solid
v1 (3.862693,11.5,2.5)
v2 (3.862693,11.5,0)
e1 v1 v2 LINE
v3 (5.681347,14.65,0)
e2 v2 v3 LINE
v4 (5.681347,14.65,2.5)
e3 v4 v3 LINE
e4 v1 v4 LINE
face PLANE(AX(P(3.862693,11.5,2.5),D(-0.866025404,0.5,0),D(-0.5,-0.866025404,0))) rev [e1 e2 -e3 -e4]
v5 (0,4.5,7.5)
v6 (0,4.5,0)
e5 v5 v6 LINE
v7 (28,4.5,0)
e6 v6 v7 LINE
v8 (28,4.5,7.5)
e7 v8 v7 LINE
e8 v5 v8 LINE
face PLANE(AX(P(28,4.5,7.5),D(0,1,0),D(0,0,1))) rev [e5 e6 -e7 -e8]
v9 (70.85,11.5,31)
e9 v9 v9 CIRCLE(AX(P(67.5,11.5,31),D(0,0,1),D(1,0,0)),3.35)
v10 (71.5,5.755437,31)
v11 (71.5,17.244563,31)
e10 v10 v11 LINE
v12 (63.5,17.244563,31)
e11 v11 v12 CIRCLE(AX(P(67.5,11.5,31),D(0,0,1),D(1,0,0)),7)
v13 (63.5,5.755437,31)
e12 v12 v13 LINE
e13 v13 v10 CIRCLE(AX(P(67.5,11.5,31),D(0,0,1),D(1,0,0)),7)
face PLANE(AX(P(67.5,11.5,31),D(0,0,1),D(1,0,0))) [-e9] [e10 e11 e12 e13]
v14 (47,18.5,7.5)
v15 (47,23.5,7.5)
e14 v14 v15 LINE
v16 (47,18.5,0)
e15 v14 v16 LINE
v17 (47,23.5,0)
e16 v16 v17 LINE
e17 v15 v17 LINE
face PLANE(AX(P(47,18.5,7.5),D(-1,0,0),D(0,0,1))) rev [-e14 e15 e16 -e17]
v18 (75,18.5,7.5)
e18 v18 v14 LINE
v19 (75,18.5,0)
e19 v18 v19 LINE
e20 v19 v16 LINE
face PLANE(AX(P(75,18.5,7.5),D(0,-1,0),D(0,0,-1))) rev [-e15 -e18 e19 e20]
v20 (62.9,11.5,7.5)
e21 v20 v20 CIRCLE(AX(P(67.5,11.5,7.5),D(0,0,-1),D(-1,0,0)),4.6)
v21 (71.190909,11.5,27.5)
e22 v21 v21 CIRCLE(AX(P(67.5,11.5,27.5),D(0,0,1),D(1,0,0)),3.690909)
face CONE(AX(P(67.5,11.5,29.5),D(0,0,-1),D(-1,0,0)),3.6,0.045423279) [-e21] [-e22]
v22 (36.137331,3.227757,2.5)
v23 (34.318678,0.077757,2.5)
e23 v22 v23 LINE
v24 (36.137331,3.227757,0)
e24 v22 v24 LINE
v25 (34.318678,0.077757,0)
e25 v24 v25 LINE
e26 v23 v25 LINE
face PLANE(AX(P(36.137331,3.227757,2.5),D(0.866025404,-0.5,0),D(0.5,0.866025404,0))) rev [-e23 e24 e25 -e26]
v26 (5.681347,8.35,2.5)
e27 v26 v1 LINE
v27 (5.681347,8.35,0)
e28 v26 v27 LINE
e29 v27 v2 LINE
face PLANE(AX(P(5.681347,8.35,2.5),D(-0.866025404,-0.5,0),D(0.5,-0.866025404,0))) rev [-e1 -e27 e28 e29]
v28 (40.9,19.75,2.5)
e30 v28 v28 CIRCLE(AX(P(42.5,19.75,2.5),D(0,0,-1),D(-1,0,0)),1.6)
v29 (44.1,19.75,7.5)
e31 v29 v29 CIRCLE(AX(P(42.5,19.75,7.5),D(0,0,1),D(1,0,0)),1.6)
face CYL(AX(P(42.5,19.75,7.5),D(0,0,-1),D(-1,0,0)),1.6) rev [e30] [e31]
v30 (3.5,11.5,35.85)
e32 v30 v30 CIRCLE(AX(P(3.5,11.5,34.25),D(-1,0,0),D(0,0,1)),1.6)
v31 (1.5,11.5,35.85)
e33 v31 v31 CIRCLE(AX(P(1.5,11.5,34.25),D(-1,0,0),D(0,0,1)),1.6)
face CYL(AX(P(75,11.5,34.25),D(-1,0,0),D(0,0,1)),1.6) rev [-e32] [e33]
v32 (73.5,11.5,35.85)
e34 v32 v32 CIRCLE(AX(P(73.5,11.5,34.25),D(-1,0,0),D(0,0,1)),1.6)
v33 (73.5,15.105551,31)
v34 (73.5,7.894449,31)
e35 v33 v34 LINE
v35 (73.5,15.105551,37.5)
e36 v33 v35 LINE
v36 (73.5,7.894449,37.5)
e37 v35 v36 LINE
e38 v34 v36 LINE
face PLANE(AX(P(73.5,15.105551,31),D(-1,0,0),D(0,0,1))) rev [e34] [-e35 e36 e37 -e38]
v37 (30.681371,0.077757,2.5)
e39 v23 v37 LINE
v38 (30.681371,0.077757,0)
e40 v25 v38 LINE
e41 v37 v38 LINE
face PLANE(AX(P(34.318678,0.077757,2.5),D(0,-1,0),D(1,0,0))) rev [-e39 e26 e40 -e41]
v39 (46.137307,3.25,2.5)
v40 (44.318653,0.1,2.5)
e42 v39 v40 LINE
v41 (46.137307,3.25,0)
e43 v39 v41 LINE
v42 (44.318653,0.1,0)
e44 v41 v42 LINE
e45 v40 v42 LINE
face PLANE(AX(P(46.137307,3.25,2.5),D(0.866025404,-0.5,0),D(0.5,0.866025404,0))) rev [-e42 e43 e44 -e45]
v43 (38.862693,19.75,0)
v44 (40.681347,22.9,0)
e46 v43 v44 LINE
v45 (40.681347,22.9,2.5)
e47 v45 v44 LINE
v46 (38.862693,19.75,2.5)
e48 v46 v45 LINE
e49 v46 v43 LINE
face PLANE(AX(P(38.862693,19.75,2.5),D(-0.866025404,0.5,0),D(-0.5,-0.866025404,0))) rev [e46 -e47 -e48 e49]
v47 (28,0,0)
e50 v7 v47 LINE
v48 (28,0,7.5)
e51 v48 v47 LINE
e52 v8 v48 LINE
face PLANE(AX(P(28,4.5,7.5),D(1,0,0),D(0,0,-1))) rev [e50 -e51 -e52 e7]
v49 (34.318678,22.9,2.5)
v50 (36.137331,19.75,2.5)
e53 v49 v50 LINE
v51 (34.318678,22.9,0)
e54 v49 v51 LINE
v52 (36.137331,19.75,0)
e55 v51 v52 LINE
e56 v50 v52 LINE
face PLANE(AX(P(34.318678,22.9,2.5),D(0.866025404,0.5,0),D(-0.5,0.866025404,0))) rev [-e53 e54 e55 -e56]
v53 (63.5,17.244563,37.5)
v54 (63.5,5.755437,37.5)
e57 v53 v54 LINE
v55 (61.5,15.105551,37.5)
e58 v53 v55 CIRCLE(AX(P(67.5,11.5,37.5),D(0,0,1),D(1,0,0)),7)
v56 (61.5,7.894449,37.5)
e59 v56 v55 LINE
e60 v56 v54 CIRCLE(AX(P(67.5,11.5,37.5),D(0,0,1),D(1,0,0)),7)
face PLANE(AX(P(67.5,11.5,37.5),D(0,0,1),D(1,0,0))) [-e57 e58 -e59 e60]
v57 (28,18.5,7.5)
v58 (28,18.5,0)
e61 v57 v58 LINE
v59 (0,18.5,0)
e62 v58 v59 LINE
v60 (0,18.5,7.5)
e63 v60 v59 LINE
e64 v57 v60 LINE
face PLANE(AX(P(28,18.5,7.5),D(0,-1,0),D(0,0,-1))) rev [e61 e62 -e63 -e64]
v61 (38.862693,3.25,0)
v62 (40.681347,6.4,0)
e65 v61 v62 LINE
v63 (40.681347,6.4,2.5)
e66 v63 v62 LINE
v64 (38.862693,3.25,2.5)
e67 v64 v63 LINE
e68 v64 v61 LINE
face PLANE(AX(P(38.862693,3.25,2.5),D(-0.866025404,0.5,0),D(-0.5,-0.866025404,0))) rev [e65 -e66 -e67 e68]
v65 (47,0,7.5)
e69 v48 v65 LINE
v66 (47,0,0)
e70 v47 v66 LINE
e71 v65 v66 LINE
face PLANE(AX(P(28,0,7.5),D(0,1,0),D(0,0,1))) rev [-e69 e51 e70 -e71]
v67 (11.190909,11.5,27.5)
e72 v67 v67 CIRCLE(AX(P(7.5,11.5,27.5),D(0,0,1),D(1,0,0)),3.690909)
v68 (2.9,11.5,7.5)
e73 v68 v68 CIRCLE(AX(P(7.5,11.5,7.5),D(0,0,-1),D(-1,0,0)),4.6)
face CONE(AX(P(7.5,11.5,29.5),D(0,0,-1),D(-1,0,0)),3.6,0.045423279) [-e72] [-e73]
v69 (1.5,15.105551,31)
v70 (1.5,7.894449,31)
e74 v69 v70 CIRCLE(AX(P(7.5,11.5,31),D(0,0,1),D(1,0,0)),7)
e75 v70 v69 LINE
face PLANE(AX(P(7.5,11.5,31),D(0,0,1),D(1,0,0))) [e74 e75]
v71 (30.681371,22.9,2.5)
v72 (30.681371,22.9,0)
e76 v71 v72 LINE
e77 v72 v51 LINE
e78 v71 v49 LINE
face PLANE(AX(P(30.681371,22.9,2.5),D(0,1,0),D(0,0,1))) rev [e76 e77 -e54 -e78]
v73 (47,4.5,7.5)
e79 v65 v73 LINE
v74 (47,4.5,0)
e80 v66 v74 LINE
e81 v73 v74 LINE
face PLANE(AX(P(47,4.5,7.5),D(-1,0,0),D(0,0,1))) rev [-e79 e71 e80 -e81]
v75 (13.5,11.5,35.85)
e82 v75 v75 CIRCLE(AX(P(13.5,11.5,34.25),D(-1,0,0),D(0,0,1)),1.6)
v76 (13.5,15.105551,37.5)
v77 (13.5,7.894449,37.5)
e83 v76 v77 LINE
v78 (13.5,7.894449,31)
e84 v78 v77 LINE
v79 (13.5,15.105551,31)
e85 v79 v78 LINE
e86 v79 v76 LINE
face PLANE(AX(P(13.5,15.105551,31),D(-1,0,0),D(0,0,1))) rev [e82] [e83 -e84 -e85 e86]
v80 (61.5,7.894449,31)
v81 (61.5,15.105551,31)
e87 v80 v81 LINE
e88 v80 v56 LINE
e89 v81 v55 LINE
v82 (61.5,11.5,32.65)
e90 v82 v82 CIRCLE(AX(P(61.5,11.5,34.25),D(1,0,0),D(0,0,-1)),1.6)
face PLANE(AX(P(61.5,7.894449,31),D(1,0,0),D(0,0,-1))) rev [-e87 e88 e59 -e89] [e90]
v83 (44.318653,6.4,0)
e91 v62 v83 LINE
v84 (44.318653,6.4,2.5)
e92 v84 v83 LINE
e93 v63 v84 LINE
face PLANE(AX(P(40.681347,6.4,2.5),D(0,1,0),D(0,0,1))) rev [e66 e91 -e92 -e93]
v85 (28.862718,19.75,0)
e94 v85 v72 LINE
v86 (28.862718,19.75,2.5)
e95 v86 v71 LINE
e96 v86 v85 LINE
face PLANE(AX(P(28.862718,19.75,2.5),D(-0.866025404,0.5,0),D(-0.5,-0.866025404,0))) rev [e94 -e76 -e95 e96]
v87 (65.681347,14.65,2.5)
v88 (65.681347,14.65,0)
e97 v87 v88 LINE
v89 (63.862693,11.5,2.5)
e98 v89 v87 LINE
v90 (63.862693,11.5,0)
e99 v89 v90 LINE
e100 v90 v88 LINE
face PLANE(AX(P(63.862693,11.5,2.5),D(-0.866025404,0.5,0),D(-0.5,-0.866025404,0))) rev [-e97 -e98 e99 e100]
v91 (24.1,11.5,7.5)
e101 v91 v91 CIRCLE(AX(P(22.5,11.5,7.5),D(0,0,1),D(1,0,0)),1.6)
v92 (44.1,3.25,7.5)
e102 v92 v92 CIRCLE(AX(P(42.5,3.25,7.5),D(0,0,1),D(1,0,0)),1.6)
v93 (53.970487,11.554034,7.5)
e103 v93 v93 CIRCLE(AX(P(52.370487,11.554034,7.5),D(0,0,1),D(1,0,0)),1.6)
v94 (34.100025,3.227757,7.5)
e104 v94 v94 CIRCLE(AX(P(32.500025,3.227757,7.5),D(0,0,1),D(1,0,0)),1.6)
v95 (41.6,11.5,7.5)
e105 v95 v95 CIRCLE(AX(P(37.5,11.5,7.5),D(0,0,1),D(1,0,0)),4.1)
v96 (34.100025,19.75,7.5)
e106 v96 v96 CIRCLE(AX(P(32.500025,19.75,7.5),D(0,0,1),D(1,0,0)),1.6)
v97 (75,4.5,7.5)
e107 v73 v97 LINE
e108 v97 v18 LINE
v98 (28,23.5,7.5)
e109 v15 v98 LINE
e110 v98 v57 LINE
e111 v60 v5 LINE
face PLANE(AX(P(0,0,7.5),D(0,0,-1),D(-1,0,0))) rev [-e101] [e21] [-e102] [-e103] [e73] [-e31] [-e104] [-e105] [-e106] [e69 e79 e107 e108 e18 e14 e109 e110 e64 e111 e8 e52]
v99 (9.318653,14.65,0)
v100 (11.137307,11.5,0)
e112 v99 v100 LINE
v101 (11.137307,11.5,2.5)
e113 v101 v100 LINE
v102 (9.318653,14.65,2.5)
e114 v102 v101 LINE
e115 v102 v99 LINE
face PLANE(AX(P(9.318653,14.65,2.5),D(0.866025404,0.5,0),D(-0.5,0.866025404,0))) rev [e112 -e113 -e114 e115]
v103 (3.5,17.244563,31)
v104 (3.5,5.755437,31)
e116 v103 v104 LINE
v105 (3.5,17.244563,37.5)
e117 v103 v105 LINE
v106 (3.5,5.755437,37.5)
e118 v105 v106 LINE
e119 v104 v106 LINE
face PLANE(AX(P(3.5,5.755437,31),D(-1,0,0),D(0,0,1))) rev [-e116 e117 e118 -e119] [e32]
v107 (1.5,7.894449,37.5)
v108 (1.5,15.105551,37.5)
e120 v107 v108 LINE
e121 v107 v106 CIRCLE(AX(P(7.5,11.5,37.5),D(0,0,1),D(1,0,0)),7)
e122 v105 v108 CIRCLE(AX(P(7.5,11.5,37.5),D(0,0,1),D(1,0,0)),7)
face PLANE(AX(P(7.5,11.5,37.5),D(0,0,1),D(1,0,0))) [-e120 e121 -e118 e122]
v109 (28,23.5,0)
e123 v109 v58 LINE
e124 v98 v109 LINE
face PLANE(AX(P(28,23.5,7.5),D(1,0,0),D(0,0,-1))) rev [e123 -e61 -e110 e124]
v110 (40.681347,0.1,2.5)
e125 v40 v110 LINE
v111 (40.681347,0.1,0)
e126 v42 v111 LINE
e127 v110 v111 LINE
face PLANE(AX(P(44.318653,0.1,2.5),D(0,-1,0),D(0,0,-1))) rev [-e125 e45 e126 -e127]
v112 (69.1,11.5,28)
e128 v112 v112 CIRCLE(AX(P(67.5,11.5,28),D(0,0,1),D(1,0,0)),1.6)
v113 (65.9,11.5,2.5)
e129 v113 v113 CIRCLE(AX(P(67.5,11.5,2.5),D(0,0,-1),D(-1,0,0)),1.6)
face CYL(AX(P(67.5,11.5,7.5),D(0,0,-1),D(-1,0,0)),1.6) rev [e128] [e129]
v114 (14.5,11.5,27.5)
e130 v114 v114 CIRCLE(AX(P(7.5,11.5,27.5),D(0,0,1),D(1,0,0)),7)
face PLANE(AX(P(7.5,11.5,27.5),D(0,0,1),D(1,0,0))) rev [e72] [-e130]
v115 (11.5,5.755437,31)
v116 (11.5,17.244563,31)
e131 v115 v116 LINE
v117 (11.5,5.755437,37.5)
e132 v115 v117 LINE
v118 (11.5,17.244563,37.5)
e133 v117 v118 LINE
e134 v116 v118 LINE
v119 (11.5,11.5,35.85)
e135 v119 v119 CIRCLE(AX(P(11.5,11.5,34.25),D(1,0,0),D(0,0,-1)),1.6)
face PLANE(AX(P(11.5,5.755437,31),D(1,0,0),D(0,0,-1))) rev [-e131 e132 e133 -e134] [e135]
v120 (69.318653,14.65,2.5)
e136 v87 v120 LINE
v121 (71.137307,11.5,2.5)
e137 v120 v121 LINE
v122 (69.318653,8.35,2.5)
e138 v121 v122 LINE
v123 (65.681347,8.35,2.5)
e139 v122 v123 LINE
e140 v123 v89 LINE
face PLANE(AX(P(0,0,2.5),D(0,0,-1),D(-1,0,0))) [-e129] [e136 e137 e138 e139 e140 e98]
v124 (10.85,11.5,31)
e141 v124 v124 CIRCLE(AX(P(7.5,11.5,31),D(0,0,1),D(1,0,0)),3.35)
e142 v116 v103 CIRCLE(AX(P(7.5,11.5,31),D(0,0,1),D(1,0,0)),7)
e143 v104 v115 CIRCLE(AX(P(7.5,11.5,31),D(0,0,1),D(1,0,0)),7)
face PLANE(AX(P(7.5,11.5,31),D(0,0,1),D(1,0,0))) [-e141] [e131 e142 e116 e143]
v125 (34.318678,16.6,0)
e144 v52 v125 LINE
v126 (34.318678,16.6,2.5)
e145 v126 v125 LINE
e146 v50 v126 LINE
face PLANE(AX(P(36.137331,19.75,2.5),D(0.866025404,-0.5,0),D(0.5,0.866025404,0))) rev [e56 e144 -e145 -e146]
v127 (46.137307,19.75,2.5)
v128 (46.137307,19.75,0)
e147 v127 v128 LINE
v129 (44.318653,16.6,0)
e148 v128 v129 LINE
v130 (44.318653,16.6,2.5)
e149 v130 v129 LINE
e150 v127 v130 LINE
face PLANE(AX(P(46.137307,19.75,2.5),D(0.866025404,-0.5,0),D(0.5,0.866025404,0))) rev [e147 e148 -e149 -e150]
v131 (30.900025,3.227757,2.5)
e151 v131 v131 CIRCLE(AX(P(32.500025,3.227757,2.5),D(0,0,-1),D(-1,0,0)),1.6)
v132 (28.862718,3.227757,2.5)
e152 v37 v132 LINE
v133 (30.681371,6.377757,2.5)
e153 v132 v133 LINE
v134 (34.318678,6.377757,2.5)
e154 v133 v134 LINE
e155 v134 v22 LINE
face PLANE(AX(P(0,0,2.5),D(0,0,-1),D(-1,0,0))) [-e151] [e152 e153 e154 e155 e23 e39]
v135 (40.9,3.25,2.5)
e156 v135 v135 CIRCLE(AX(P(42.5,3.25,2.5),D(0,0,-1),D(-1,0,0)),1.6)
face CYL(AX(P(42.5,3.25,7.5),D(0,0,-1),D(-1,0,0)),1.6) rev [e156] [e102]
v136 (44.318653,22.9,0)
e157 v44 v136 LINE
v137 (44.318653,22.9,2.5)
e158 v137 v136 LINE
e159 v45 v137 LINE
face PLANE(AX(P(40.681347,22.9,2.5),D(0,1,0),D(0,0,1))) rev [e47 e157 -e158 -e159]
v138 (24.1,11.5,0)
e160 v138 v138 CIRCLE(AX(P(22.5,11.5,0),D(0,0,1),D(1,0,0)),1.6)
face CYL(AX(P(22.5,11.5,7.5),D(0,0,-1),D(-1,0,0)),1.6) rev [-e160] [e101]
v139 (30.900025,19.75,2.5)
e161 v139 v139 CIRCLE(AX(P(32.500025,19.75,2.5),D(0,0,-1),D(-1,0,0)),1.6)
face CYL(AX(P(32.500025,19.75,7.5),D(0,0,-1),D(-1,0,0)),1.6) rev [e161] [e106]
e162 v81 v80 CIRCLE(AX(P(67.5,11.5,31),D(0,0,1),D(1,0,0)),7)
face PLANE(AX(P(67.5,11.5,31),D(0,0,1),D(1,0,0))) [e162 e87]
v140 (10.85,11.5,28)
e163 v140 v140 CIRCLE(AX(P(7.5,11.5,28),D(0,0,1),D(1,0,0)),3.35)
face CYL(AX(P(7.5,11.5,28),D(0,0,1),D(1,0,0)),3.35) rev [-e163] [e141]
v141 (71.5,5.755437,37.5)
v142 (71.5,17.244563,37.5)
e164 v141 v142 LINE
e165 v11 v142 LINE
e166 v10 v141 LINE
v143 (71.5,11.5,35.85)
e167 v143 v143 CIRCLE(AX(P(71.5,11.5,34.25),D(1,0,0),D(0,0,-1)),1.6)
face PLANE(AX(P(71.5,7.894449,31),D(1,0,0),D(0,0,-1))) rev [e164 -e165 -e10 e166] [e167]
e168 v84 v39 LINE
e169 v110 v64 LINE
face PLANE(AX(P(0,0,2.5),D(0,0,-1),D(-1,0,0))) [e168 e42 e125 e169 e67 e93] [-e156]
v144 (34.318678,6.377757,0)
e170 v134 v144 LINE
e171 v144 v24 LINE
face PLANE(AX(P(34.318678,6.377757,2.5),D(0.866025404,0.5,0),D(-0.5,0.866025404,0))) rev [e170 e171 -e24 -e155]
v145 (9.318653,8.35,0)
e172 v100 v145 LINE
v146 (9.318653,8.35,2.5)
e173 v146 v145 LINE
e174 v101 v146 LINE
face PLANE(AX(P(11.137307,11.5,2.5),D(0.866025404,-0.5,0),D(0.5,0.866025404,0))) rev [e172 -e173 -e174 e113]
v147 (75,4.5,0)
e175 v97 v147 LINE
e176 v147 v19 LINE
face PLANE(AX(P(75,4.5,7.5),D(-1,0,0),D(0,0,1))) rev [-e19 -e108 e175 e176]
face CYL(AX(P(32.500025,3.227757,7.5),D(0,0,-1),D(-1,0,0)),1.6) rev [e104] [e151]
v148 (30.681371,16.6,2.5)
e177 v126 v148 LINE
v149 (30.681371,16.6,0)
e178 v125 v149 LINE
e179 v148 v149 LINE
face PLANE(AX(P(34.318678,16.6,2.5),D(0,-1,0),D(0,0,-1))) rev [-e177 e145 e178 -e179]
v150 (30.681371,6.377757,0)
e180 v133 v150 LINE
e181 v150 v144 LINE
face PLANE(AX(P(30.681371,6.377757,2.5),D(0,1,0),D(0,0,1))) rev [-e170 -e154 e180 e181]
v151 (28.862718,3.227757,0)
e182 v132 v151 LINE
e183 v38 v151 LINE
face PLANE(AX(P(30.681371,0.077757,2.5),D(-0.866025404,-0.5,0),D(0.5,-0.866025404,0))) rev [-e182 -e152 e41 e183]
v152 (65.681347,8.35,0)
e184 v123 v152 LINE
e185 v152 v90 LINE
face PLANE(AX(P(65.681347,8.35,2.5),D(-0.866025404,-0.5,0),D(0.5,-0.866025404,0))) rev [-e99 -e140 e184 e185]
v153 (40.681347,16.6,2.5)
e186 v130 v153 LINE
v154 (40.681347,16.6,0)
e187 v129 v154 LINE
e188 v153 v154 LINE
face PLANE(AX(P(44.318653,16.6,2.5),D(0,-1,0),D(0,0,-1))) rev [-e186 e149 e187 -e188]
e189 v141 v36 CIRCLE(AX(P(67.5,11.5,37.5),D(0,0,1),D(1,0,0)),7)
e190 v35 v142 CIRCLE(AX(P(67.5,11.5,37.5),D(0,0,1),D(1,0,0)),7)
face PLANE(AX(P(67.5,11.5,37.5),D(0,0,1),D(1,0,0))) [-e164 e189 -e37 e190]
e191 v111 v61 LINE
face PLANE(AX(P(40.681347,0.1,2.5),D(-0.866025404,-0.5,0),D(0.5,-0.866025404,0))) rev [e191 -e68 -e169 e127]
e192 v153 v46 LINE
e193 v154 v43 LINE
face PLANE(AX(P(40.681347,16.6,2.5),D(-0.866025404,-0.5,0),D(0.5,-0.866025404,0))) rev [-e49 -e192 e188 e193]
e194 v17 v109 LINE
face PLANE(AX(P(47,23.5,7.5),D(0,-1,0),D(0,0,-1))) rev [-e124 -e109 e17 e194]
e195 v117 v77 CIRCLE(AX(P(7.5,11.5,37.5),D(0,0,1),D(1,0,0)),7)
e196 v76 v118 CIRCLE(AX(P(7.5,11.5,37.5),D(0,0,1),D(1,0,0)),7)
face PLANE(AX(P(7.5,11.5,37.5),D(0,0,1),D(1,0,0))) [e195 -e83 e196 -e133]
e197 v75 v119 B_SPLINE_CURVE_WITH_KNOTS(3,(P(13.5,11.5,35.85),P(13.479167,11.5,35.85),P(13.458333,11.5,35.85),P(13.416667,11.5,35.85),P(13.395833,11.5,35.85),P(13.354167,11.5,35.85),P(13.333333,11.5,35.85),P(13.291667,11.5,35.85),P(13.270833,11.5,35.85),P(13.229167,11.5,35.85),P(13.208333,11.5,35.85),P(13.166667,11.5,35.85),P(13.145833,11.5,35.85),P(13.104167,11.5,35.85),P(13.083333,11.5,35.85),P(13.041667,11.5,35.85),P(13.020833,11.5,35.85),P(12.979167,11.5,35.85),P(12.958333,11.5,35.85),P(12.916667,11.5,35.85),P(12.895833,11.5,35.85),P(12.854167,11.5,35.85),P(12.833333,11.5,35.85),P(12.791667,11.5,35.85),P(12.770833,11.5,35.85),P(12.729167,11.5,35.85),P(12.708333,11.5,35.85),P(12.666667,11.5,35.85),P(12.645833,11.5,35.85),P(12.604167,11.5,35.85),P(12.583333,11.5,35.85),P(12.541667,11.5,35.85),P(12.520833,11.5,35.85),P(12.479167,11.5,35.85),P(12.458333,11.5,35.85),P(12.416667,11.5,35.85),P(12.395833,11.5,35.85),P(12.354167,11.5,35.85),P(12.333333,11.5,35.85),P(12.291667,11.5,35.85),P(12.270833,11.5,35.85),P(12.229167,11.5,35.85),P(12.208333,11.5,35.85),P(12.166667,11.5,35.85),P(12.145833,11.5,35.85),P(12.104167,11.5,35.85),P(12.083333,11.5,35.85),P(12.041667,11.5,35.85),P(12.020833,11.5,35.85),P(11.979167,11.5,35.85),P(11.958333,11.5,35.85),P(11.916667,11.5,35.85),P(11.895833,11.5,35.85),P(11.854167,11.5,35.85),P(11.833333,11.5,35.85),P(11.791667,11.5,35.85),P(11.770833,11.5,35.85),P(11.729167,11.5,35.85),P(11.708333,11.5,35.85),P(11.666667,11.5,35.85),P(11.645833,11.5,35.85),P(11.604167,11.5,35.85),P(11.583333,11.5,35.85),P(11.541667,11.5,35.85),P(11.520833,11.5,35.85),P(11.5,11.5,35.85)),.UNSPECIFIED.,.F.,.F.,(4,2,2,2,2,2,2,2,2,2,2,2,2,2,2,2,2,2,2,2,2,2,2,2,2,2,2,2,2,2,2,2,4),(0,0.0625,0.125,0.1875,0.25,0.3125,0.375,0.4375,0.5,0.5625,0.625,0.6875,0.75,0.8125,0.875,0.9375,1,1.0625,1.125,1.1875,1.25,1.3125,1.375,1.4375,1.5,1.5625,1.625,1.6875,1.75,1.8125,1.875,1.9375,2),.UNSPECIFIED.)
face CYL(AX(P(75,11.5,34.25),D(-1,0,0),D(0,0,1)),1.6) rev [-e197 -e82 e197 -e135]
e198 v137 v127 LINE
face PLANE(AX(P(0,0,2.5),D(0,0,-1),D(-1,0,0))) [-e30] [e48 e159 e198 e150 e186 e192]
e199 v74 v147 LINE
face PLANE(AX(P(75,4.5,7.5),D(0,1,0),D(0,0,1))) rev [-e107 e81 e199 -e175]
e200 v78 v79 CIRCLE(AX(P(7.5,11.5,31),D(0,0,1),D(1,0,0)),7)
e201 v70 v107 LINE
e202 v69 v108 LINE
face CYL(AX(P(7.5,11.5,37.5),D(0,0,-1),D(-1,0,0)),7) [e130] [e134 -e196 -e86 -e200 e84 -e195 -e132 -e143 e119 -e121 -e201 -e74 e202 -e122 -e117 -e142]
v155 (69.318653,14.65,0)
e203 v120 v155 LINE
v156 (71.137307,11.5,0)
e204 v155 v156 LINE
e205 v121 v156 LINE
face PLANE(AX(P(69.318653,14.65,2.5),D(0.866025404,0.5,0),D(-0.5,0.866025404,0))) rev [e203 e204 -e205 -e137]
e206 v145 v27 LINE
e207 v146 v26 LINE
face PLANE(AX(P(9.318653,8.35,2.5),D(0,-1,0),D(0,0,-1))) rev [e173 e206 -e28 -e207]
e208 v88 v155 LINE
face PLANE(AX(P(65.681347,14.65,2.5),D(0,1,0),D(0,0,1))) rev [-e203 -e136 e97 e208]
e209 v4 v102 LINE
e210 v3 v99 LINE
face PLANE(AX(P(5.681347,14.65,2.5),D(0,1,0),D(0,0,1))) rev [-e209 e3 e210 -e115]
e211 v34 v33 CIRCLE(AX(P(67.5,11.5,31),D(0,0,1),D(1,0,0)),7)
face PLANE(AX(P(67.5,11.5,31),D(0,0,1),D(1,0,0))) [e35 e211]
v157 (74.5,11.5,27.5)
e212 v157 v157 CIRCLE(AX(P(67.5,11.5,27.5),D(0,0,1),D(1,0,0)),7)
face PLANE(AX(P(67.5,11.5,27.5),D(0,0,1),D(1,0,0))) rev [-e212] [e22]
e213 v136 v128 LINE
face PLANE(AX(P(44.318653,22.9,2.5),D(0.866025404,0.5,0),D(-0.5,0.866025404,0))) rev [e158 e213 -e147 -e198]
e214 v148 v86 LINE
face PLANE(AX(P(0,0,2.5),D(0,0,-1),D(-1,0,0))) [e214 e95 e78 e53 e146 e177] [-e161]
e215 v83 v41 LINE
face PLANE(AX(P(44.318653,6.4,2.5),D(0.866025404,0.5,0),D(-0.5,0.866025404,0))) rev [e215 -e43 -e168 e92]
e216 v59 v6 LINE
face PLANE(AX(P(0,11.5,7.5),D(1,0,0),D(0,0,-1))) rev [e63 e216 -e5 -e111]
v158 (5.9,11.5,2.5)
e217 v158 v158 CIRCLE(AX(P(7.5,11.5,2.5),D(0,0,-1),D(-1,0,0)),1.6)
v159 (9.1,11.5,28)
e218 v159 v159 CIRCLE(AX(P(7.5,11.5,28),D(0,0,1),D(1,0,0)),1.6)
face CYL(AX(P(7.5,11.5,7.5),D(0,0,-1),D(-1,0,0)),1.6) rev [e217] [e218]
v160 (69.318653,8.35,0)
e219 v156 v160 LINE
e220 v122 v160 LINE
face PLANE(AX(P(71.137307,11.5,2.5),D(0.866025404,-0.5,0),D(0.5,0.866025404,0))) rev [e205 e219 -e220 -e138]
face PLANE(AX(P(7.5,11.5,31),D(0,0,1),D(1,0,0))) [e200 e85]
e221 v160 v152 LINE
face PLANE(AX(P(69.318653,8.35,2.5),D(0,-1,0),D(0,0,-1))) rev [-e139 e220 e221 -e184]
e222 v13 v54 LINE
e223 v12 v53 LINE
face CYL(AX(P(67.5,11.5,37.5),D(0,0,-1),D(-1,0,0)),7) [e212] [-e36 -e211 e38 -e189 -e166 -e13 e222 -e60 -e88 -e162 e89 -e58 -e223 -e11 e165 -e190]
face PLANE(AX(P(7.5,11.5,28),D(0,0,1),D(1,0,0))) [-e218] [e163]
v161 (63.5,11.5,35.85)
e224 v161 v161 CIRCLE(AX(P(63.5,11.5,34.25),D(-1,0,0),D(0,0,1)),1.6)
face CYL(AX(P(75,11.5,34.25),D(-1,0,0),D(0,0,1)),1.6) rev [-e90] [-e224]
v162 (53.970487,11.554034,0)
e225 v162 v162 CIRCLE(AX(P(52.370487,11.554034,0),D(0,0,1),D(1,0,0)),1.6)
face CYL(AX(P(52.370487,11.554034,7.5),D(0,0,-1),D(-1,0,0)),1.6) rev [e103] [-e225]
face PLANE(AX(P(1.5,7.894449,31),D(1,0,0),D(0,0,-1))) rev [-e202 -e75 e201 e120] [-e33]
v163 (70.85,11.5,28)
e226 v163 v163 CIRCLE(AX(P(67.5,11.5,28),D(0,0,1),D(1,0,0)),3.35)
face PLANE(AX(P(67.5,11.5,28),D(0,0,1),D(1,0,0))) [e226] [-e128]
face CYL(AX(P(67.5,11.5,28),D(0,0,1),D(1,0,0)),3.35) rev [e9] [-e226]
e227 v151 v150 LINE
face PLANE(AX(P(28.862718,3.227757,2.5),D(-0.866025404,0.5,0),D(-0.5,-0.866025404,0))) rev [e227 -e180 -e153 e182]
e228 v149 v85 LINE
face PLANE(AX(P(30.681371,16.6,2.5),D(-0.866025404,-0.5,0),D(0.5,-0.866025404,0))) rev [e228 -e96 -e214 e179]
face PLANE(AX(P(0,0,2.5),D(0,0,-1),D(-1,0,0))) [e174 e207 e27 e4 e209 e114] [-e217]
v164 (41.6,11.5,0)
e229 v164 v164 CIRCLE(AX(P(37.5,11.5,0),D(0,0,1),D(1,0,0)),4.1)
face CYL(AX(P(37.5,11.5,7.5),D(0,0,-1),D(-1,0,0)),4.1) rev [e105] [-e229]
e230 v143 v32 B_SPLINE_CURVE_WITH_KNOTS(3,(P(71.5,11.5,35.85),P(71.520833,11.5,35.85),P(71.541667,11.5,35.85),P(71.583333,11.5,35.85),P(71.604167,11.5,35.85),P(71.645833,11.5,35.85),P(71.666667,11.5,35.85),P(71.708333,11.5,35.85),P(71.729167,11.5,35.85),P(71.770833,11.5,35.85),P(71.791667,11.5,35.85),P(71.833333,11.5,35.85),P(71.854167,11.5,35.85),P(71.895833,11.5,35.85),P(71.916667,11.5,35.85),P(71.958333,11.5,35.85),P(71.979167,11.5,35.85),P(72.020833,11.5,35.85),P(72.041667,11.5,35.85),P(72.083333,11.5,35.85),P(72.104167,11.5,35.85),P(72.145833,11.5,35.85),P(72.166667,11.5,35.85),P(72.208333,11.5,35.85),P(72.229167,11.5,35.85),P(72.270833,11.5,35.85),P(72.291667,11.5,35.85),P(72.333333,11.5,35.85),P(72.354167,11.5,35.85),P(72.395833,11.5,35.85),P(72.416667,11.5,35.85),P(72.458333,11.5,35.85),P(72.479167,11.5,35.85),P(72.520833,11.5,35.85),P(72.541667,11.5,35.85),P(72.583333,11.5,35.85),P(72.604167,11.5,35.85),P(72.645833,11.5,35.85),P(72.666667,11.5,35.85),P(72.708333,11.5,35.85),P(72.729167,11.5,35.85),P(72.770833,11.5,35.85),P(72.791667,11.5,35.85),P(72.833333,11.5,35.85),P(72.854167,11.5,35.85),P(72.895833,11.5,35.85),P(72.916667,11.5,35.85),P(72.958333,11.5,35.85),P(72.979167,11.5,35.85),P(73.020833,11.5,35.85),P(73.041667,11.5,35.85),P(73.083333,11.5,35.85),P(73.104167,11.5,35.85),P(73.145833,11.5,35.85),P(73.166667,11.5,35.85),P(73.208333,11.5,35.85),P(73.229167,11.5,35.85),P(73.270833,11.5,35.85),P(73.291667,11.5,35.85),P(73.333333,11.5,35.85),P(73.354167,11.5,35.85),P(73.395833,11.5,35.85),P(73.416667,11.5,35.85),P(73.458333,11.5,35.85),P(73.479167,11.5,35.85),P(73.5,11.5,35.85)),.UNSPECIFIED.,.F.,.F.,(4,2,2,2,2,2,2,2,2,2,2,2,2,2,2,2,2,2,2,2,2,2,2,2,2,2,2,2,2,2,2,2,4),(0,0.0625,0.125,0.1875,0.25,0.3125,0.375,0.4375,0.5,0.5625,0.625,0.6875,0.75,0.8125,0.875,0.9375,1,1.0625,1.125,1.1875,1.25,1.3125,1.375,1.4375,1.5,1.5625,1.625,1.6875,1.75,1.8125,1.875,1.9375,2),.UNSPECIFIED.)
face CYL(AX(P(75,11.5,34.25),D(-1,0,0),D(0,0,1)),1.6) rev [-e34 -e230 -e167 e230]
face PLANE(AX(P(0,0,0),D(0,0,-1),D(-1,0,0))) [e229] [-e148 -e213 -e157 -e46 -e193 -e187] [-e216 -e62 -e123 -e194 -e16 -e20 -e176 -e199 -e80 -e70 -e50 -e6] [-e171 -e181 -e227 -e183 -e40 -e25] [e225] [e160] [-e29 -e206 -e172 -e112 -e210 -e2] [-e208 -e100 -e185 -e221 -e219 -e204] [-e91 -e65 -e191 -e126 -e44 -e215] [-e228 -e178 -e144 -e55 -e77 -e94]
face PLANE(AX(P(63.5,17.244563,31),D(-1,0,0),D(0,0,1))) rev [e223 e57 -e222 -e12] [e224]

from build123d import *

# Parameters (mm, degrees)
SKETCH_1_R          = 4.1
SKETCH_1_R_2        = 1.6
EXTRUDE_1_DEPTH     = 7.5
CUT_EXTRUDE_1_DEPTH = 2.5
SKETCH_4_R          = 3.6
SKETCH_4_R_2        = 1.6
EXTRUDE_2_DEPTH     = 20
SKETCH_5_R          = 7
SKETCH_5_R_2        = 1.6
EXTRUDE_3_DEPTH     = 10
CUT_EXTRUDE_START   = -6.5
CUT_EXTRUDE_2_DEPTH = 6.5
SKETCH_7_R          = 1.6
CUT_EXTRUDE_3_DEPTH = 86.794813363
CHAMFER_1_SIZE      = 1
CHAMFER_1_SIZE_2    = 22
SKETCH_9_R          = 3.35
CUT_EXTRUDE_4_DEPTH = 3
SKETCH_11_R         = 3.35
CUT_EXTRUDE_5_DEPTH = 3


with BuildPart() as part:
    # 草图1 → 凸台-拉伸1 (new body)
    with BuildSketch(Plane.XY):
        Polygon((0, 11.5), (0, 4.5), (0.416202301, 4.5), (28, 4.5), (28, 0), (47, 0), (47, 4.5), (75, 4.5), (75, 18.5), (47, 18.5), (47, 23.5), (28, 23.5), (28, 18.5), (0, 18.5), align=None)
        with Locations((37.5, 11.5)):
            Circle(SKETCH_1_R, mode=Mode.SUBTRACT)
        with Locations((67.5, 11.5)):
            Circle(SKETCH_1_R_2, mode=Mode.SUBTRACT)
        with Locations((32.500024738, 3.227756818)):
            Circle(SKETCH_1_R_2, mode=Mode.SUBTRACT)
        with Locations((42.5, 3.25)):
            Circle(SKETCH_1_R_2, mode=Mode.SUBTRACT)
        with Locations((42.5, 19.75)):
            Circle(SKETCH_1_R_2, mode=Mode.SUBTRACT)
        with Locations((32.500024738, 19.75)):
            Circle(SKETCH_1_R_2, mode=Mode.SUBTRACT)
        with Locations((7.5, 11.5)):
            Circle(SKETCH_1_R_2, mode=Mode.SUBTRACT)
        with Locations((52.370486737, 11.554033831)):
            Circle(SKETCH_1_R_2, mode=Mode.SUBTRACT)
        with Locations((22.5, 11.5)):
            Circle(SKETCH_1_R_2, mode=Mode.SUBTRACT)
    extrude(amount=EXTRUDE_1_DEPTH)

    # 草图2 → 切除-拉伸1 (cut)
    with BuildSketch(Plane(origin=(0, 0, 0), x_dir=(-1, 0, 0), z_dir=(0, 0, -1))):
        Polygon((-38.862693304, 19.75), (-40.681346652, 22.9), (-44.318653348, 22.9), (-46.137306696, 19.75), (-44.318653348, 16.6), (-40.681346652, 16.6), align=None)
        Polygon((-28.862718042, 19.75), (-30.68137139, 22.9), (-34.318678086, 22.9), (-36.137331434, 19.75), (-34.318678086, 16.6), (-30.68137139, 16.6), align=None)
        Polygon((-38.862693304, 3.25), (-40.681346652, 6.4), (-44.318653348, 6.4), (-46.137306696, 3.25), (-44.318653348, 0.1), (-40.681346652, 0.1), align=None)
        Polygon((-28.862718042, 3.227756818), (-30.68137139, 6.377756818), (-34.318678086, 6.377756818), (-36.137331434, 3.227756818), (-34.318678086, 0.077756818), (-30.68137139, 0.077756818), align=None)
        Polygon((-63.862693304, 11.5), (-65.681346652, 14.65), (-69.318653348, 14.65), (-71.137306696, 11.5), (-69.318653348, 8.35), (-65.681346652, 8.35), align=None)
        Polygon((-3.862693304, 11.5), (-5.681346652, 14.65), (-9.318653348, 14.65), (-11.137306696, 11.5), (-9.318653348, 8.35), (-5.681346652, 8.35), align=None)
    extrude(amount=-CUT_EXTRUDE_1_DEPTH, mode=Mode.SUBTRACT)

    # 草图4 → 凸台-拉伸2 (add)
    # profile 1 of 2: a face of its own
    with BuildSketch(Plane.XY.offset(7.5)):
        with Locations(Location((7.5, 11.5, 0), (0, 0, 180))):
            Circle(SKETCH_4_R)
        with Locations(Location((7.5, 11.5, 0), (0, 0, 180))):
            Circle(SKETCH_4_R_2, mode=Mode.SUBTRACT)
    # profile 2 of 2: a face of its own
    with BuildSketch(Plane.XY.offset(7.5)):
        with Locations(Location((67.5, 11.5, 0), (0, 0, 180))):
            Circle(SKETCH_4_R)
        with Locations(Location((67.5, 11.5, 0), (0, 0, 180))):
            Circle(SKETCH_4_R_2, mode=Mode.SUBTRACT)
    extrude(amount=EXTRUDE_2_DEPTH)

    # 草图5 → 凸台-拉伸3 (add)
    # profile 1 of 2: a face of its own
    with BuildSketch(Plane.XY.offset(27.5)):
        with Locations((7.5, 11.5)):
            Circle(SKETCH_5_R)
        with Locations(Location((7.5, 11.5, 0), (0, 0, 180))):
            Circle(SKETCH_5_R_2, mode=Mode.SUBTRACT)
    # profile 2 of 2: a face of its own
    with BuildSketch(Plane.XY.offset(27.5)):
        with Locations((67.5, 11.5)):
            Circle(SKETCH_5_R)
        with Locations(Location((67.5, 11.5, 0), (0, 0, 180))):
            Circle(SKETCH_5_R_2, mode=Mode.SUBTRACT)
    extrude(amount=EXTRUDE_3_DEPTH)

    # 草图6 → 切除-拉伸2 (cut)
    with BuildSketch(Plane.XY.offset(37.5).offset(CUT_EXTRUDE_START)):
        with BuildLine():
            Line((1.5, 7.894448725), (1.5, 15.105551275))
            ThreePointArc((1.5, 15.105551275), (0.5, 11.5), (1.5, 7.894448725))
        make_face()
        with BuildLine():
            Line((73.5, 15.105551275), (73.5, 7.894448725))
            ThreePointArc((73.5, 7.894448725), (74.5, 11.5), (73.5, 15.105551275))
        make_face()
        with BuildLine():
            Line((3.5, 5.755437353), (3.5, 17.244562647))
            ThreePointArc((3.5, 17.244562647), (7.5, 18.5), (11.5, 17.244562647))
            Line((11.5, 17.244562647), (11.5, 5.755437353))
            ThreePointArc((11.5, 5.755437353), (7.5, 4.5), (3.5, 5.755437353))
        make_face()
        with BuildLine():
            Line((71.5, 7.894448725), (71.5, 17.244562647))
            ThreePointArc((71.5, 17.244562647), (67.5, 18.5), (63.5, 17.244562647))
            Line((63.5, 17.244562647), (63.5, 5.755437353))
            ThreePointArc((63.5, 5.755437353), (67.5, 4.5), (71.5, 5.755437353))
            Line((71.5, 5.755437353), (71.5, 7.894448725))
        make_face()
        with BuildLine():
            Line((13.5, 15.105551275), (13.5, 7.894448725))
            ThreePointArc((13.5, 7.894448725), (14.5, 11.5), (13.5, 15.105551275))
        make_face()
        with BuildLine():
            Line((61.5, 7.894448725), (61.5, 15.105551275))
            ThreePointArc((61.5, 15.105551275), (60.5, 11.5), (61.5, 7.894448725))
        make_face()
    extrude(amount=CUT_EXTRUDE_2_DEPTH, mode=Mode.SUBTRACT)

    # 草图7 → 切除-拉伸3 (cut, through all)
    with BuildSketch(Plane.ZY.offset(-1.5)):
        with Locations((34.25, 11.5)):
            Circle(SKETCH_7_R)
    extrude(amount=-CUT_EXTRUDE_3_DEPTH, mode=Mode.SUBTRACT)

    # 倒角1
    # the kernel refuses this chamfer: 22, 1 mm, written as the material it adds along each edge
    with BuildSketch(Plane(origin=(67.5, 11.5, 7.5), x_dir=(-1, 0, 0), z_dir=(0, 1, 0))) as chamfer_1_piece_1:
        Polygon((3.6 + CHAMFER_1_SIZE, 0), (3.6, CHAMFER_1_SIZE_2), (3.6, 0), align=None)
    revolve(axis=Axis((67.5, 11.5, 7.5), (0, 0, 1)))
    with BuildSketch(Plane(origin=(7.5, 11.5, 7.5), x_dir=(-1, 0, 0), z_dir=(0, 1, 0))) as chamfer_1_piece_2:
        Polygon((3.6 + CHAMFER_1_SIZE, 0), (3.6, CHAMFER_1_SIZE_2), (3.6, 0), align=None)
    revolve(axis=Axis((7.5, 11.5, 7.5), (0, 0, 1)))

    # 草图9 → 切除-拉伸4 (cut)
    with BuildSketch(Plane.XY.offset(31)):
        with Locations((7.5, 11.5)):
            Circle(SKETCH_9_R)
    extrude(amount=-CUT_EXTRUDE_4_DEPTH, mode=Mode.SUBTRACT)

    # 草图11 → 切除-拉伸5 (cut)
    with BuildSketch(Plane.XY.offset(31)):
        with Locations((67.5, 11.5)):
            Circle(SKETCH_11_R)
    extrude(amount=-CUT_EXTRUDE_5_DEPTH, mode=Mode.SUBTRACT)


solid = part.part
